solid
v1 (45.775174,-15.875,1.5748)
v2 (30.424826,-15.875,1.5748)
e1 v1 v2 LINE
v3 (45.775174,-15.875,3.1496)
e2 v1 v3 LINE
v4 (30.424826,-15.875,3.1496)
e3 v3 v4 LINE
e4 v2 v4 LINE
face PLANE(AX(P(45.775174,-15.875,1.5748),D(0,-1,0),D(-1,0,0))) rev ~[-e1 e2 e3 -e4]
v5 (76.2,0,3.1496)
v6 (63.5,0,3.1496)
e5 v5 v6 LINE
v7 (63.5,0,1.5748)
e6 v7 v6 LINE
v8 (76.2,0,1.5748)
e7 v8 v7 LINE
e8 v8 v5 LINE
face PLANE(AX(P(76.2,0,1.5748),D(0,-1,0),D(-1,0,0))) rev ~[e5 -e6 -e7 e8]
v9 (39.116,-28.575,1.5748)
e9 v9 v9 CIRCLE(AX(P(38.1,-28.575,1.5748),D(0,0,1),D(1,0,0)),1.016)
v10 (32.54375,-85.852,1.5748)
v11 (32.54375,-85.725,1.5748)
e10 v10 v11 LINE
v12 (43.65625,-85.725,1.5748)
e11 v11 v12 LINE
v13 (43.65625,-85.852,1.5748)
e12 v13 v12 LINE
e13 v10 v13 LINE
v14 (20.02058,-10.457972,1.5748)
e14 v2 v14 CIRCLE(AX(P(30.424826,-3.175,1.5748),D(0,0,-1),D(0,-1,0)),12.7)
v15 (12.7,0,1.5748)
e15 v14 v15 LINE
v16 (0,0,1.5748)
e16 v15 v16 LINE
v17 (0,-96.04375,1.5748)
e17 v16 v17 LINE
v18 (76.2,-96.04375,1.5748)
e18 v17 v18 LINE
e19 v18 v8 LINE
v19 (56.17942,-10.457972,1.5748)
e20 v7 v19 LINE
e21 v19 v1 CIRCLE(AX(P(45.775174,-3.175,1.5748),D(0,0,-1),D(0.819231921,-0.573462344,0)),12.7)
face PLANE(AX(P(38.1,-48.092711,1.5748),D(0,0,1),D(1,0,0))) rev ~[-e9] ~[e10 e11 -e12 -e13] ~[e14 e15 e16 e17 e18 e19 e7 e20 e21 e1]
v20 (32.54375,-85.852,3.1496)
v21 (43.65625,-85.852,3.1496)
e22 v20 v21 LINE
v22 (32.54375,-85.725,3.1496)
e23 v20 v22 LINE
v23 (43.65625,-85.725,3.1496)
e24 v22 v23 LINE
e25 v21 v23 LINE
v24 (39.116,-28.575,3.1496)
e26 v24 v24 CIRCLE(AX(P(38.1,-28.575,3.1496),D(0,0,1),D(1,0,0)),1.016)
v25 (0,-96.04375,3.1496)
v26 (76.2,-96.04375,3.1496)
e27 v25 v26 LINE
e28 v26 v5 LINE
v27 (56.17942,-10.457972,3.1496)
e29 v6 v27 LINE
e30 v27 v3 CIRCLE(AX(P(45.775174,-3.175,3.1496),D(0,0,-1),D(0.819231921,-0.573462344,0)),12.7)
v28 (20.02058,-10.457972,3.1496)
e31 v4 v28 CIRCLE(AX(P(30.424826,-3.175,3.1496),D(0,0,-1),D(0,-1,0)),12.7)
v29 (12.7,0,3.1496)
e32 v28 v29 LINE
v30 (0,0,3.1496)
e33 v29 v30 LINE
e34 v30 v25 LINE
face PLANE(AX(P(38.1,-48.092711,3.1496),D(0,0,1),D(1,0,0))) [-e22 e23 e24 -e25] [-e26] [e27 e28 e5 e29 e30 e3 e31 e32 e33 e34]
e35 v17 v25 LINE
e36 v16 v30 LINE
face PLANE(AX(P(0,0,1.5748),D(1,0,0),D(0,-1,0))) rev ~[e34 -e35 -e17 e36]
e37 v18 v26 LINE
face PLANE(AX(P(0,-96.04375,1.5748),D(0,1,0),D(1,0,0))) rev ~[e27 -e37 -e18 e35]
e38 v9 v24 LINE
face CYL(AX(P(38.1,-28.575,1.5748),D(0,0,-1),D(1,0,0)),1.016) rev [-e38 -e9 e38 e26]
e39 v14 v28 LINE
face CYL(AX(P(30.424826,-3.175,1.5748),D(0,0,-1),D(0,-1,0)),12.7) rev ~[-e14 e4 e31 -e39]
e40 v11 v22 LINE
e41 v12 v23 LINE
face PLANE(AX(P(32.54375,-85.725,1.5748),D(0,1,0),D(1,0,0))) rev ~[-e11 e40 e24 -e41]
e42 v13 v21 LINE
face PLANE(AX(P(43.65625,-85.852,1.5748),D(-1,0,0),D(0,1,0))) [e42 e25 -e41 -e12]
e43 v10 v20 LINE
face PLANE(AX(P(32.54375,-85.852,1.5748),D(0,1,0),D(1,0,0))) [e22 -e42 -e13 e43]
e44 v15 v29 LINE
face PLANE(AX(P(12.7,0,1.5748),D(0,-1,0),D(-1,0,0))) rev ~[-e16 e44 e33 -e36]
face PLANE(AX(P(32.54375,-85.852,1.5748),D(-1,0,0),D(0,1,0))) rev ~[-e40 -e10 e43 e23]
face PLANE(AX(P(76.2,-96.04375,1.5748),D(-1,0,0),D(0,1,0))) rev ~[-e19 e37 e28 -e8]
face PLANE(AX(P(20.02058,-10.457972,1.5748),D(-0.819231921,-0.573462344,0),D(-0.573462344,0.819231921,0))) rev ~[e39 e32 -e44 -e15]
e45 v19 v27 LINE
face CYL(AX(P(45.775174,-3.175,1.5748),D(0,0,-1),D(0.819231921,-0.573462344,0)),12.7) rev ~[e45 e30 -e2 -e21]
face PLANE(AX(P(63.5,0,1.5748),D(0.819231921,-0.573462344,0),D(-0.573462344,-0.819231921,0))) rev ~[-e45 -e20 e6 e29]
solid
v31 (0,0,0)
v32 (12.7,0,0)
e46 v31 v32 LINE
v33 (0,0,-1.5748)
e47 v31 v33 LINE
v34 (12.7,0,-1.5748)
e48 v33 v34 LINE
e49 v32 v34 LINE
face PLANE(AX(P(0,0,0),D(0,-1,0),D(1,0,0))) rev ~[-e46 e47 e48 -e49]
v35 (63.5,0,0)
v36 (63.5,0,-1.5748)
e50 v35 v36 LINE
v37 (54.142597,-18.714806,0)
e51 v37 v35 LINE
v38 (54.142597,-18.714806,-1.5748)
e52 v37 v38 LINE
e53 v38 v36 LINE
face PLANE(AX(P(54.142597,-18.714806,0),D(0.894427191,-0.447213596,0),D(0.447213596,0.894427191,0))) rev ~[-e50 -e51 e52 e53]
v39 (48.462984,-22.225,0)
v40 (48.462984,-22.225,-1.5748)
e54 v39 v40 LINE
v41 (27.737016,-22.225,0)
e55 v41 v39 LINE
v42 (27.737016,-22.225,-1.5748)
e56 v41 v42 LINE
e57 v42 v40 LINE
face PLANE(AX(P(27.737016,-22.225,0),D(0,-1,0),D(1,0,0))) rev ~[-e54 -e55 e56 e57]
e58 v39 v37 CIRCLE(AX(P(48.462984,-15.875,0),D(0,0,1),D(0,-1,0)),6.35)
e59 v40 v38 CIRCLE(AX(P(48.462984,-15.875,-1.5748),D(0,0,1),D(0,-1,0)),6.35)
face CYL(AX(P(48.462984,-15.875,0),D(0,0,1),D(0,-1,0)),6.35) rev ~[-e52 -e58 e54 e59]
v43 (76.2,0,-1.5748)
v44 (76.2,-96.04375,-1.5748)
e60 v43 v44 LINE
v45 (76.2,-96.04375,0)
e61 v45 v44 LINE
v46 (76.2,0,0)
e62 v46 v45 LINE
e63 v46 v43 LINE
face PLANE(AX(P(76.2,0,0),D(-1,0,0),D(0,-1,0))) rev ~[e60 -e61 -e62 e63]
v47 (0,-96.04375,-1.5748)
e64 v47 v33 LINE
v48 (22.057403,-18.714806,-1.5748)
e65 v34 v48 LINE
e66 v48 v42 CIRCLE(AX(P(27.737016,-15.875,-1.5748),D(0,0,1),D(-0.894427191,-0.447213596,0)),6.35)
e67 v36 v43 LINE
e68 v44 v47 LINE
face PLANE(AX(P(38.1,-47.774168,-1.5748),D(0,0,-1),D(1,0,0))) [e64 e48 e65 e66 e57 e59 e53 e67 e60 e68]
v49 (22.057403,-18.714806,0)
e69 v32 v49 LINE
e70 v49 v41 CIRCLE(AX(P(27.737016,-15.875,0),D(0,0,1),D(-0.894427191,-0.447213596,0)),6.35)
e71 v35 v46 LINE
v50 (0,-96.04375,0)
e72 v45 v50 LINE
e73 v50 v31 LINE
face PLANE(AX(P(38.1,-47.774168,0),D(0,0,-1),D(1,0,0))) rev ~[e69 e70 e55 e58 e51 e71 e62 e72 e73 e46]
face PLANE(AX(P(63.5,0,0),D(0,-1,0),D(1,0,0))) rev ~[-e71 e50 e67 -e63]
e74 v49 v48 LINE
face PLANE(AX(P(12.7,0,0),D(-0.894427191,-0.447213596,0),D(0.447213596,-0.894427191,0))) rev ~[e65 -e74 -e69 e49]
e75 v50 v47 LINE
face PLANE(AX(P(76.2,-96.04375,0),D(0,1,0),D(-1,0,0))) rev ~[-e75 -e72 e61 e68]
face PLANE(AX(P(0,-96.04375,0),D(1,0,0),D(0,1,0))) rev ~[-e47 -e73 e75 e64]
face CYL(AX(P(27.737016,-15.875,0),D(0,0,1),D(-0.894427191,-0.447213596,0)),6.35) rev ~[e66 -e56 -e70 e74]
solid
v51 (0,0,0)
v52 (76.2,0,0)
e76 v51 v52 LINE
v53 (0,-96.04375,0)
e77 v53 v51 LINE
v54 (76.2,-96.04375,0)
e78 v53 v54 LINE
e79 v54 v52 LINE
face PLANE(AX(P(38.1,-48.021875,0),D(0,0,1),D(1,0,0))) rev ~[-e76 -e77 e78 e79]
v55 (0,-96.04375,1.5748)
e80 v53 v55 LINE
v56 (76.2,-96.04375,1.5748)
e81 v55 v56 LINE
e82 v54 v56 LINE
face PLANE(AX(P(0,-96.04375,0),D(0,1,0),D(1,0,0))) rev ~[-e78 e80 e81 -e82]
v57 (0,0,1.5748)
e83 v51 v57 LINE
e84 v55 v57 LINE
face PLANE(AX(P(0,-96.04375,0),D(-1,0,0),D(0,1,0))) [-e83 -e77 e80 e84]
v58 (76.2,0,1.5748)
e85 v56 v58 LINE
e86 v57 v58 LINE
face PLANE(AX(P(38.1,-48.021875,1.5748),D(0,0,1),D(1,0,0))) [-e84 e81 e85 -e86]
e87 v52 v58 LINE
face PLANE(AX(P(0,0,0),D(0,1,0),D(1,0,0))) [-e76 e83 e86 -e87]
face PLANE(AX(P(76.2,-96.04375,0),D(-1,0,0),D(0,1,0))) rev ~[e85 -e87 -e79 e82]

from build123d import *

# Parameters (mm, degrees)
F0_W     = 76.2
F0_H     = 96.04375
F1_DEPTH = 1.5748
F2_W     = 11.1125
F2_H     = 0.127
F2_R     = 1.016
F3_DEPTH = 1.5748
F5_DEPTH = 1.5748


# Not quite as in the source:
# - a feature of the source that left no trace in its solid (it failed there, or was rolled back) is left out


with BuildPart() as f1:
    # F0 (on Top) → F1 (new body)
    with BuildSketch(Plane.XY):
        with Locations((38.1, -48.021875)):
            Rectangle(F0_W, F0_H)
    extrude(amount=F1_DEPTH)


with BuildPart() as f3:
    # F2 (on face) → F3 (new body)
    with BuildSketch(Plane.XY.offset(1.5748)):
        with BuildLine():
            Line((0, 0), (0, -96.04375))
            Line((0, -96.04375), (76.2, -96.04375))
            Line((76.2, -96.04375), (76.2, 0))
            Line((76.2, 0), (63.5, 0))
            Line((63.5, 0), (56.1794197586, -10.4579717734))
            ThreePointArc((56.1794197586, -10.4579717734), (51.6401662042, -14.4396291888), (45.775174368, -15.875))
            Line((45.775174368, -15.875), (38.1, -15.875))
            Line((38.1, -15.875), (30.424825632, -15.875))
            ThreePointArc((30.424825632, -15.875), (24.5598337958, -14.4396291888), (20.0205802414, -10.4579717734))
            Line((20.0205802414, -10.4579717734), (12.7, 0))
            Line((12.7, 0), (0, 0))
        make_face()
        with Locations((38.1, -85.7885)):
            Rectangle(F2_W, F2_H, mode=Mode.SUBTRACT)
        with Locations((38.1, -28.575)):
            Circle(F2_R, mode=Mode.SUBTRACT)
    extrude(amount=F3_DEPTH)


with BuildPart() as f5:
    # F4 (on face) → F5 (new body)
    with BuildSketch(Plane(origin=(0, 0, 0), x_dir=(1, 0, 0), z_dir=(0, 0, -1))):
        with BuildLine():
            Line((76.2, 96.04375), (0, 96.04375))
            Line((0, 96.04375), (0, 0))
            Line((0, 0), (12.7, 0))
            Line((12.7, 0), (22.0574031657, 18.7148063314))
            ThreePointArc((22.0574031657, 18.7148063314), (24.3986232666, 21.276632633), (27.7370158286, 22.225))
            Line((27.7370158286, 22.225), (38.1, 22.225))
            Line((38.1, 22.225), (48.4629841714, 22.225))
            ThreePointArc((48.4629841714, 22.225), (51.8013767334, 21.276632633), (54.1425968343, 18.7148063314))
            Line((54.1425968343, 18.7148063314), (63.5, 0))
            Line((63.5, 0), (76.2, 0))
            Line((76.2, 0), (76.2, 96.04375))
        make_face()
    extrude(amount=F5_DEPTH)


solid = Compound([f1.part, f3.part, f5.part])
